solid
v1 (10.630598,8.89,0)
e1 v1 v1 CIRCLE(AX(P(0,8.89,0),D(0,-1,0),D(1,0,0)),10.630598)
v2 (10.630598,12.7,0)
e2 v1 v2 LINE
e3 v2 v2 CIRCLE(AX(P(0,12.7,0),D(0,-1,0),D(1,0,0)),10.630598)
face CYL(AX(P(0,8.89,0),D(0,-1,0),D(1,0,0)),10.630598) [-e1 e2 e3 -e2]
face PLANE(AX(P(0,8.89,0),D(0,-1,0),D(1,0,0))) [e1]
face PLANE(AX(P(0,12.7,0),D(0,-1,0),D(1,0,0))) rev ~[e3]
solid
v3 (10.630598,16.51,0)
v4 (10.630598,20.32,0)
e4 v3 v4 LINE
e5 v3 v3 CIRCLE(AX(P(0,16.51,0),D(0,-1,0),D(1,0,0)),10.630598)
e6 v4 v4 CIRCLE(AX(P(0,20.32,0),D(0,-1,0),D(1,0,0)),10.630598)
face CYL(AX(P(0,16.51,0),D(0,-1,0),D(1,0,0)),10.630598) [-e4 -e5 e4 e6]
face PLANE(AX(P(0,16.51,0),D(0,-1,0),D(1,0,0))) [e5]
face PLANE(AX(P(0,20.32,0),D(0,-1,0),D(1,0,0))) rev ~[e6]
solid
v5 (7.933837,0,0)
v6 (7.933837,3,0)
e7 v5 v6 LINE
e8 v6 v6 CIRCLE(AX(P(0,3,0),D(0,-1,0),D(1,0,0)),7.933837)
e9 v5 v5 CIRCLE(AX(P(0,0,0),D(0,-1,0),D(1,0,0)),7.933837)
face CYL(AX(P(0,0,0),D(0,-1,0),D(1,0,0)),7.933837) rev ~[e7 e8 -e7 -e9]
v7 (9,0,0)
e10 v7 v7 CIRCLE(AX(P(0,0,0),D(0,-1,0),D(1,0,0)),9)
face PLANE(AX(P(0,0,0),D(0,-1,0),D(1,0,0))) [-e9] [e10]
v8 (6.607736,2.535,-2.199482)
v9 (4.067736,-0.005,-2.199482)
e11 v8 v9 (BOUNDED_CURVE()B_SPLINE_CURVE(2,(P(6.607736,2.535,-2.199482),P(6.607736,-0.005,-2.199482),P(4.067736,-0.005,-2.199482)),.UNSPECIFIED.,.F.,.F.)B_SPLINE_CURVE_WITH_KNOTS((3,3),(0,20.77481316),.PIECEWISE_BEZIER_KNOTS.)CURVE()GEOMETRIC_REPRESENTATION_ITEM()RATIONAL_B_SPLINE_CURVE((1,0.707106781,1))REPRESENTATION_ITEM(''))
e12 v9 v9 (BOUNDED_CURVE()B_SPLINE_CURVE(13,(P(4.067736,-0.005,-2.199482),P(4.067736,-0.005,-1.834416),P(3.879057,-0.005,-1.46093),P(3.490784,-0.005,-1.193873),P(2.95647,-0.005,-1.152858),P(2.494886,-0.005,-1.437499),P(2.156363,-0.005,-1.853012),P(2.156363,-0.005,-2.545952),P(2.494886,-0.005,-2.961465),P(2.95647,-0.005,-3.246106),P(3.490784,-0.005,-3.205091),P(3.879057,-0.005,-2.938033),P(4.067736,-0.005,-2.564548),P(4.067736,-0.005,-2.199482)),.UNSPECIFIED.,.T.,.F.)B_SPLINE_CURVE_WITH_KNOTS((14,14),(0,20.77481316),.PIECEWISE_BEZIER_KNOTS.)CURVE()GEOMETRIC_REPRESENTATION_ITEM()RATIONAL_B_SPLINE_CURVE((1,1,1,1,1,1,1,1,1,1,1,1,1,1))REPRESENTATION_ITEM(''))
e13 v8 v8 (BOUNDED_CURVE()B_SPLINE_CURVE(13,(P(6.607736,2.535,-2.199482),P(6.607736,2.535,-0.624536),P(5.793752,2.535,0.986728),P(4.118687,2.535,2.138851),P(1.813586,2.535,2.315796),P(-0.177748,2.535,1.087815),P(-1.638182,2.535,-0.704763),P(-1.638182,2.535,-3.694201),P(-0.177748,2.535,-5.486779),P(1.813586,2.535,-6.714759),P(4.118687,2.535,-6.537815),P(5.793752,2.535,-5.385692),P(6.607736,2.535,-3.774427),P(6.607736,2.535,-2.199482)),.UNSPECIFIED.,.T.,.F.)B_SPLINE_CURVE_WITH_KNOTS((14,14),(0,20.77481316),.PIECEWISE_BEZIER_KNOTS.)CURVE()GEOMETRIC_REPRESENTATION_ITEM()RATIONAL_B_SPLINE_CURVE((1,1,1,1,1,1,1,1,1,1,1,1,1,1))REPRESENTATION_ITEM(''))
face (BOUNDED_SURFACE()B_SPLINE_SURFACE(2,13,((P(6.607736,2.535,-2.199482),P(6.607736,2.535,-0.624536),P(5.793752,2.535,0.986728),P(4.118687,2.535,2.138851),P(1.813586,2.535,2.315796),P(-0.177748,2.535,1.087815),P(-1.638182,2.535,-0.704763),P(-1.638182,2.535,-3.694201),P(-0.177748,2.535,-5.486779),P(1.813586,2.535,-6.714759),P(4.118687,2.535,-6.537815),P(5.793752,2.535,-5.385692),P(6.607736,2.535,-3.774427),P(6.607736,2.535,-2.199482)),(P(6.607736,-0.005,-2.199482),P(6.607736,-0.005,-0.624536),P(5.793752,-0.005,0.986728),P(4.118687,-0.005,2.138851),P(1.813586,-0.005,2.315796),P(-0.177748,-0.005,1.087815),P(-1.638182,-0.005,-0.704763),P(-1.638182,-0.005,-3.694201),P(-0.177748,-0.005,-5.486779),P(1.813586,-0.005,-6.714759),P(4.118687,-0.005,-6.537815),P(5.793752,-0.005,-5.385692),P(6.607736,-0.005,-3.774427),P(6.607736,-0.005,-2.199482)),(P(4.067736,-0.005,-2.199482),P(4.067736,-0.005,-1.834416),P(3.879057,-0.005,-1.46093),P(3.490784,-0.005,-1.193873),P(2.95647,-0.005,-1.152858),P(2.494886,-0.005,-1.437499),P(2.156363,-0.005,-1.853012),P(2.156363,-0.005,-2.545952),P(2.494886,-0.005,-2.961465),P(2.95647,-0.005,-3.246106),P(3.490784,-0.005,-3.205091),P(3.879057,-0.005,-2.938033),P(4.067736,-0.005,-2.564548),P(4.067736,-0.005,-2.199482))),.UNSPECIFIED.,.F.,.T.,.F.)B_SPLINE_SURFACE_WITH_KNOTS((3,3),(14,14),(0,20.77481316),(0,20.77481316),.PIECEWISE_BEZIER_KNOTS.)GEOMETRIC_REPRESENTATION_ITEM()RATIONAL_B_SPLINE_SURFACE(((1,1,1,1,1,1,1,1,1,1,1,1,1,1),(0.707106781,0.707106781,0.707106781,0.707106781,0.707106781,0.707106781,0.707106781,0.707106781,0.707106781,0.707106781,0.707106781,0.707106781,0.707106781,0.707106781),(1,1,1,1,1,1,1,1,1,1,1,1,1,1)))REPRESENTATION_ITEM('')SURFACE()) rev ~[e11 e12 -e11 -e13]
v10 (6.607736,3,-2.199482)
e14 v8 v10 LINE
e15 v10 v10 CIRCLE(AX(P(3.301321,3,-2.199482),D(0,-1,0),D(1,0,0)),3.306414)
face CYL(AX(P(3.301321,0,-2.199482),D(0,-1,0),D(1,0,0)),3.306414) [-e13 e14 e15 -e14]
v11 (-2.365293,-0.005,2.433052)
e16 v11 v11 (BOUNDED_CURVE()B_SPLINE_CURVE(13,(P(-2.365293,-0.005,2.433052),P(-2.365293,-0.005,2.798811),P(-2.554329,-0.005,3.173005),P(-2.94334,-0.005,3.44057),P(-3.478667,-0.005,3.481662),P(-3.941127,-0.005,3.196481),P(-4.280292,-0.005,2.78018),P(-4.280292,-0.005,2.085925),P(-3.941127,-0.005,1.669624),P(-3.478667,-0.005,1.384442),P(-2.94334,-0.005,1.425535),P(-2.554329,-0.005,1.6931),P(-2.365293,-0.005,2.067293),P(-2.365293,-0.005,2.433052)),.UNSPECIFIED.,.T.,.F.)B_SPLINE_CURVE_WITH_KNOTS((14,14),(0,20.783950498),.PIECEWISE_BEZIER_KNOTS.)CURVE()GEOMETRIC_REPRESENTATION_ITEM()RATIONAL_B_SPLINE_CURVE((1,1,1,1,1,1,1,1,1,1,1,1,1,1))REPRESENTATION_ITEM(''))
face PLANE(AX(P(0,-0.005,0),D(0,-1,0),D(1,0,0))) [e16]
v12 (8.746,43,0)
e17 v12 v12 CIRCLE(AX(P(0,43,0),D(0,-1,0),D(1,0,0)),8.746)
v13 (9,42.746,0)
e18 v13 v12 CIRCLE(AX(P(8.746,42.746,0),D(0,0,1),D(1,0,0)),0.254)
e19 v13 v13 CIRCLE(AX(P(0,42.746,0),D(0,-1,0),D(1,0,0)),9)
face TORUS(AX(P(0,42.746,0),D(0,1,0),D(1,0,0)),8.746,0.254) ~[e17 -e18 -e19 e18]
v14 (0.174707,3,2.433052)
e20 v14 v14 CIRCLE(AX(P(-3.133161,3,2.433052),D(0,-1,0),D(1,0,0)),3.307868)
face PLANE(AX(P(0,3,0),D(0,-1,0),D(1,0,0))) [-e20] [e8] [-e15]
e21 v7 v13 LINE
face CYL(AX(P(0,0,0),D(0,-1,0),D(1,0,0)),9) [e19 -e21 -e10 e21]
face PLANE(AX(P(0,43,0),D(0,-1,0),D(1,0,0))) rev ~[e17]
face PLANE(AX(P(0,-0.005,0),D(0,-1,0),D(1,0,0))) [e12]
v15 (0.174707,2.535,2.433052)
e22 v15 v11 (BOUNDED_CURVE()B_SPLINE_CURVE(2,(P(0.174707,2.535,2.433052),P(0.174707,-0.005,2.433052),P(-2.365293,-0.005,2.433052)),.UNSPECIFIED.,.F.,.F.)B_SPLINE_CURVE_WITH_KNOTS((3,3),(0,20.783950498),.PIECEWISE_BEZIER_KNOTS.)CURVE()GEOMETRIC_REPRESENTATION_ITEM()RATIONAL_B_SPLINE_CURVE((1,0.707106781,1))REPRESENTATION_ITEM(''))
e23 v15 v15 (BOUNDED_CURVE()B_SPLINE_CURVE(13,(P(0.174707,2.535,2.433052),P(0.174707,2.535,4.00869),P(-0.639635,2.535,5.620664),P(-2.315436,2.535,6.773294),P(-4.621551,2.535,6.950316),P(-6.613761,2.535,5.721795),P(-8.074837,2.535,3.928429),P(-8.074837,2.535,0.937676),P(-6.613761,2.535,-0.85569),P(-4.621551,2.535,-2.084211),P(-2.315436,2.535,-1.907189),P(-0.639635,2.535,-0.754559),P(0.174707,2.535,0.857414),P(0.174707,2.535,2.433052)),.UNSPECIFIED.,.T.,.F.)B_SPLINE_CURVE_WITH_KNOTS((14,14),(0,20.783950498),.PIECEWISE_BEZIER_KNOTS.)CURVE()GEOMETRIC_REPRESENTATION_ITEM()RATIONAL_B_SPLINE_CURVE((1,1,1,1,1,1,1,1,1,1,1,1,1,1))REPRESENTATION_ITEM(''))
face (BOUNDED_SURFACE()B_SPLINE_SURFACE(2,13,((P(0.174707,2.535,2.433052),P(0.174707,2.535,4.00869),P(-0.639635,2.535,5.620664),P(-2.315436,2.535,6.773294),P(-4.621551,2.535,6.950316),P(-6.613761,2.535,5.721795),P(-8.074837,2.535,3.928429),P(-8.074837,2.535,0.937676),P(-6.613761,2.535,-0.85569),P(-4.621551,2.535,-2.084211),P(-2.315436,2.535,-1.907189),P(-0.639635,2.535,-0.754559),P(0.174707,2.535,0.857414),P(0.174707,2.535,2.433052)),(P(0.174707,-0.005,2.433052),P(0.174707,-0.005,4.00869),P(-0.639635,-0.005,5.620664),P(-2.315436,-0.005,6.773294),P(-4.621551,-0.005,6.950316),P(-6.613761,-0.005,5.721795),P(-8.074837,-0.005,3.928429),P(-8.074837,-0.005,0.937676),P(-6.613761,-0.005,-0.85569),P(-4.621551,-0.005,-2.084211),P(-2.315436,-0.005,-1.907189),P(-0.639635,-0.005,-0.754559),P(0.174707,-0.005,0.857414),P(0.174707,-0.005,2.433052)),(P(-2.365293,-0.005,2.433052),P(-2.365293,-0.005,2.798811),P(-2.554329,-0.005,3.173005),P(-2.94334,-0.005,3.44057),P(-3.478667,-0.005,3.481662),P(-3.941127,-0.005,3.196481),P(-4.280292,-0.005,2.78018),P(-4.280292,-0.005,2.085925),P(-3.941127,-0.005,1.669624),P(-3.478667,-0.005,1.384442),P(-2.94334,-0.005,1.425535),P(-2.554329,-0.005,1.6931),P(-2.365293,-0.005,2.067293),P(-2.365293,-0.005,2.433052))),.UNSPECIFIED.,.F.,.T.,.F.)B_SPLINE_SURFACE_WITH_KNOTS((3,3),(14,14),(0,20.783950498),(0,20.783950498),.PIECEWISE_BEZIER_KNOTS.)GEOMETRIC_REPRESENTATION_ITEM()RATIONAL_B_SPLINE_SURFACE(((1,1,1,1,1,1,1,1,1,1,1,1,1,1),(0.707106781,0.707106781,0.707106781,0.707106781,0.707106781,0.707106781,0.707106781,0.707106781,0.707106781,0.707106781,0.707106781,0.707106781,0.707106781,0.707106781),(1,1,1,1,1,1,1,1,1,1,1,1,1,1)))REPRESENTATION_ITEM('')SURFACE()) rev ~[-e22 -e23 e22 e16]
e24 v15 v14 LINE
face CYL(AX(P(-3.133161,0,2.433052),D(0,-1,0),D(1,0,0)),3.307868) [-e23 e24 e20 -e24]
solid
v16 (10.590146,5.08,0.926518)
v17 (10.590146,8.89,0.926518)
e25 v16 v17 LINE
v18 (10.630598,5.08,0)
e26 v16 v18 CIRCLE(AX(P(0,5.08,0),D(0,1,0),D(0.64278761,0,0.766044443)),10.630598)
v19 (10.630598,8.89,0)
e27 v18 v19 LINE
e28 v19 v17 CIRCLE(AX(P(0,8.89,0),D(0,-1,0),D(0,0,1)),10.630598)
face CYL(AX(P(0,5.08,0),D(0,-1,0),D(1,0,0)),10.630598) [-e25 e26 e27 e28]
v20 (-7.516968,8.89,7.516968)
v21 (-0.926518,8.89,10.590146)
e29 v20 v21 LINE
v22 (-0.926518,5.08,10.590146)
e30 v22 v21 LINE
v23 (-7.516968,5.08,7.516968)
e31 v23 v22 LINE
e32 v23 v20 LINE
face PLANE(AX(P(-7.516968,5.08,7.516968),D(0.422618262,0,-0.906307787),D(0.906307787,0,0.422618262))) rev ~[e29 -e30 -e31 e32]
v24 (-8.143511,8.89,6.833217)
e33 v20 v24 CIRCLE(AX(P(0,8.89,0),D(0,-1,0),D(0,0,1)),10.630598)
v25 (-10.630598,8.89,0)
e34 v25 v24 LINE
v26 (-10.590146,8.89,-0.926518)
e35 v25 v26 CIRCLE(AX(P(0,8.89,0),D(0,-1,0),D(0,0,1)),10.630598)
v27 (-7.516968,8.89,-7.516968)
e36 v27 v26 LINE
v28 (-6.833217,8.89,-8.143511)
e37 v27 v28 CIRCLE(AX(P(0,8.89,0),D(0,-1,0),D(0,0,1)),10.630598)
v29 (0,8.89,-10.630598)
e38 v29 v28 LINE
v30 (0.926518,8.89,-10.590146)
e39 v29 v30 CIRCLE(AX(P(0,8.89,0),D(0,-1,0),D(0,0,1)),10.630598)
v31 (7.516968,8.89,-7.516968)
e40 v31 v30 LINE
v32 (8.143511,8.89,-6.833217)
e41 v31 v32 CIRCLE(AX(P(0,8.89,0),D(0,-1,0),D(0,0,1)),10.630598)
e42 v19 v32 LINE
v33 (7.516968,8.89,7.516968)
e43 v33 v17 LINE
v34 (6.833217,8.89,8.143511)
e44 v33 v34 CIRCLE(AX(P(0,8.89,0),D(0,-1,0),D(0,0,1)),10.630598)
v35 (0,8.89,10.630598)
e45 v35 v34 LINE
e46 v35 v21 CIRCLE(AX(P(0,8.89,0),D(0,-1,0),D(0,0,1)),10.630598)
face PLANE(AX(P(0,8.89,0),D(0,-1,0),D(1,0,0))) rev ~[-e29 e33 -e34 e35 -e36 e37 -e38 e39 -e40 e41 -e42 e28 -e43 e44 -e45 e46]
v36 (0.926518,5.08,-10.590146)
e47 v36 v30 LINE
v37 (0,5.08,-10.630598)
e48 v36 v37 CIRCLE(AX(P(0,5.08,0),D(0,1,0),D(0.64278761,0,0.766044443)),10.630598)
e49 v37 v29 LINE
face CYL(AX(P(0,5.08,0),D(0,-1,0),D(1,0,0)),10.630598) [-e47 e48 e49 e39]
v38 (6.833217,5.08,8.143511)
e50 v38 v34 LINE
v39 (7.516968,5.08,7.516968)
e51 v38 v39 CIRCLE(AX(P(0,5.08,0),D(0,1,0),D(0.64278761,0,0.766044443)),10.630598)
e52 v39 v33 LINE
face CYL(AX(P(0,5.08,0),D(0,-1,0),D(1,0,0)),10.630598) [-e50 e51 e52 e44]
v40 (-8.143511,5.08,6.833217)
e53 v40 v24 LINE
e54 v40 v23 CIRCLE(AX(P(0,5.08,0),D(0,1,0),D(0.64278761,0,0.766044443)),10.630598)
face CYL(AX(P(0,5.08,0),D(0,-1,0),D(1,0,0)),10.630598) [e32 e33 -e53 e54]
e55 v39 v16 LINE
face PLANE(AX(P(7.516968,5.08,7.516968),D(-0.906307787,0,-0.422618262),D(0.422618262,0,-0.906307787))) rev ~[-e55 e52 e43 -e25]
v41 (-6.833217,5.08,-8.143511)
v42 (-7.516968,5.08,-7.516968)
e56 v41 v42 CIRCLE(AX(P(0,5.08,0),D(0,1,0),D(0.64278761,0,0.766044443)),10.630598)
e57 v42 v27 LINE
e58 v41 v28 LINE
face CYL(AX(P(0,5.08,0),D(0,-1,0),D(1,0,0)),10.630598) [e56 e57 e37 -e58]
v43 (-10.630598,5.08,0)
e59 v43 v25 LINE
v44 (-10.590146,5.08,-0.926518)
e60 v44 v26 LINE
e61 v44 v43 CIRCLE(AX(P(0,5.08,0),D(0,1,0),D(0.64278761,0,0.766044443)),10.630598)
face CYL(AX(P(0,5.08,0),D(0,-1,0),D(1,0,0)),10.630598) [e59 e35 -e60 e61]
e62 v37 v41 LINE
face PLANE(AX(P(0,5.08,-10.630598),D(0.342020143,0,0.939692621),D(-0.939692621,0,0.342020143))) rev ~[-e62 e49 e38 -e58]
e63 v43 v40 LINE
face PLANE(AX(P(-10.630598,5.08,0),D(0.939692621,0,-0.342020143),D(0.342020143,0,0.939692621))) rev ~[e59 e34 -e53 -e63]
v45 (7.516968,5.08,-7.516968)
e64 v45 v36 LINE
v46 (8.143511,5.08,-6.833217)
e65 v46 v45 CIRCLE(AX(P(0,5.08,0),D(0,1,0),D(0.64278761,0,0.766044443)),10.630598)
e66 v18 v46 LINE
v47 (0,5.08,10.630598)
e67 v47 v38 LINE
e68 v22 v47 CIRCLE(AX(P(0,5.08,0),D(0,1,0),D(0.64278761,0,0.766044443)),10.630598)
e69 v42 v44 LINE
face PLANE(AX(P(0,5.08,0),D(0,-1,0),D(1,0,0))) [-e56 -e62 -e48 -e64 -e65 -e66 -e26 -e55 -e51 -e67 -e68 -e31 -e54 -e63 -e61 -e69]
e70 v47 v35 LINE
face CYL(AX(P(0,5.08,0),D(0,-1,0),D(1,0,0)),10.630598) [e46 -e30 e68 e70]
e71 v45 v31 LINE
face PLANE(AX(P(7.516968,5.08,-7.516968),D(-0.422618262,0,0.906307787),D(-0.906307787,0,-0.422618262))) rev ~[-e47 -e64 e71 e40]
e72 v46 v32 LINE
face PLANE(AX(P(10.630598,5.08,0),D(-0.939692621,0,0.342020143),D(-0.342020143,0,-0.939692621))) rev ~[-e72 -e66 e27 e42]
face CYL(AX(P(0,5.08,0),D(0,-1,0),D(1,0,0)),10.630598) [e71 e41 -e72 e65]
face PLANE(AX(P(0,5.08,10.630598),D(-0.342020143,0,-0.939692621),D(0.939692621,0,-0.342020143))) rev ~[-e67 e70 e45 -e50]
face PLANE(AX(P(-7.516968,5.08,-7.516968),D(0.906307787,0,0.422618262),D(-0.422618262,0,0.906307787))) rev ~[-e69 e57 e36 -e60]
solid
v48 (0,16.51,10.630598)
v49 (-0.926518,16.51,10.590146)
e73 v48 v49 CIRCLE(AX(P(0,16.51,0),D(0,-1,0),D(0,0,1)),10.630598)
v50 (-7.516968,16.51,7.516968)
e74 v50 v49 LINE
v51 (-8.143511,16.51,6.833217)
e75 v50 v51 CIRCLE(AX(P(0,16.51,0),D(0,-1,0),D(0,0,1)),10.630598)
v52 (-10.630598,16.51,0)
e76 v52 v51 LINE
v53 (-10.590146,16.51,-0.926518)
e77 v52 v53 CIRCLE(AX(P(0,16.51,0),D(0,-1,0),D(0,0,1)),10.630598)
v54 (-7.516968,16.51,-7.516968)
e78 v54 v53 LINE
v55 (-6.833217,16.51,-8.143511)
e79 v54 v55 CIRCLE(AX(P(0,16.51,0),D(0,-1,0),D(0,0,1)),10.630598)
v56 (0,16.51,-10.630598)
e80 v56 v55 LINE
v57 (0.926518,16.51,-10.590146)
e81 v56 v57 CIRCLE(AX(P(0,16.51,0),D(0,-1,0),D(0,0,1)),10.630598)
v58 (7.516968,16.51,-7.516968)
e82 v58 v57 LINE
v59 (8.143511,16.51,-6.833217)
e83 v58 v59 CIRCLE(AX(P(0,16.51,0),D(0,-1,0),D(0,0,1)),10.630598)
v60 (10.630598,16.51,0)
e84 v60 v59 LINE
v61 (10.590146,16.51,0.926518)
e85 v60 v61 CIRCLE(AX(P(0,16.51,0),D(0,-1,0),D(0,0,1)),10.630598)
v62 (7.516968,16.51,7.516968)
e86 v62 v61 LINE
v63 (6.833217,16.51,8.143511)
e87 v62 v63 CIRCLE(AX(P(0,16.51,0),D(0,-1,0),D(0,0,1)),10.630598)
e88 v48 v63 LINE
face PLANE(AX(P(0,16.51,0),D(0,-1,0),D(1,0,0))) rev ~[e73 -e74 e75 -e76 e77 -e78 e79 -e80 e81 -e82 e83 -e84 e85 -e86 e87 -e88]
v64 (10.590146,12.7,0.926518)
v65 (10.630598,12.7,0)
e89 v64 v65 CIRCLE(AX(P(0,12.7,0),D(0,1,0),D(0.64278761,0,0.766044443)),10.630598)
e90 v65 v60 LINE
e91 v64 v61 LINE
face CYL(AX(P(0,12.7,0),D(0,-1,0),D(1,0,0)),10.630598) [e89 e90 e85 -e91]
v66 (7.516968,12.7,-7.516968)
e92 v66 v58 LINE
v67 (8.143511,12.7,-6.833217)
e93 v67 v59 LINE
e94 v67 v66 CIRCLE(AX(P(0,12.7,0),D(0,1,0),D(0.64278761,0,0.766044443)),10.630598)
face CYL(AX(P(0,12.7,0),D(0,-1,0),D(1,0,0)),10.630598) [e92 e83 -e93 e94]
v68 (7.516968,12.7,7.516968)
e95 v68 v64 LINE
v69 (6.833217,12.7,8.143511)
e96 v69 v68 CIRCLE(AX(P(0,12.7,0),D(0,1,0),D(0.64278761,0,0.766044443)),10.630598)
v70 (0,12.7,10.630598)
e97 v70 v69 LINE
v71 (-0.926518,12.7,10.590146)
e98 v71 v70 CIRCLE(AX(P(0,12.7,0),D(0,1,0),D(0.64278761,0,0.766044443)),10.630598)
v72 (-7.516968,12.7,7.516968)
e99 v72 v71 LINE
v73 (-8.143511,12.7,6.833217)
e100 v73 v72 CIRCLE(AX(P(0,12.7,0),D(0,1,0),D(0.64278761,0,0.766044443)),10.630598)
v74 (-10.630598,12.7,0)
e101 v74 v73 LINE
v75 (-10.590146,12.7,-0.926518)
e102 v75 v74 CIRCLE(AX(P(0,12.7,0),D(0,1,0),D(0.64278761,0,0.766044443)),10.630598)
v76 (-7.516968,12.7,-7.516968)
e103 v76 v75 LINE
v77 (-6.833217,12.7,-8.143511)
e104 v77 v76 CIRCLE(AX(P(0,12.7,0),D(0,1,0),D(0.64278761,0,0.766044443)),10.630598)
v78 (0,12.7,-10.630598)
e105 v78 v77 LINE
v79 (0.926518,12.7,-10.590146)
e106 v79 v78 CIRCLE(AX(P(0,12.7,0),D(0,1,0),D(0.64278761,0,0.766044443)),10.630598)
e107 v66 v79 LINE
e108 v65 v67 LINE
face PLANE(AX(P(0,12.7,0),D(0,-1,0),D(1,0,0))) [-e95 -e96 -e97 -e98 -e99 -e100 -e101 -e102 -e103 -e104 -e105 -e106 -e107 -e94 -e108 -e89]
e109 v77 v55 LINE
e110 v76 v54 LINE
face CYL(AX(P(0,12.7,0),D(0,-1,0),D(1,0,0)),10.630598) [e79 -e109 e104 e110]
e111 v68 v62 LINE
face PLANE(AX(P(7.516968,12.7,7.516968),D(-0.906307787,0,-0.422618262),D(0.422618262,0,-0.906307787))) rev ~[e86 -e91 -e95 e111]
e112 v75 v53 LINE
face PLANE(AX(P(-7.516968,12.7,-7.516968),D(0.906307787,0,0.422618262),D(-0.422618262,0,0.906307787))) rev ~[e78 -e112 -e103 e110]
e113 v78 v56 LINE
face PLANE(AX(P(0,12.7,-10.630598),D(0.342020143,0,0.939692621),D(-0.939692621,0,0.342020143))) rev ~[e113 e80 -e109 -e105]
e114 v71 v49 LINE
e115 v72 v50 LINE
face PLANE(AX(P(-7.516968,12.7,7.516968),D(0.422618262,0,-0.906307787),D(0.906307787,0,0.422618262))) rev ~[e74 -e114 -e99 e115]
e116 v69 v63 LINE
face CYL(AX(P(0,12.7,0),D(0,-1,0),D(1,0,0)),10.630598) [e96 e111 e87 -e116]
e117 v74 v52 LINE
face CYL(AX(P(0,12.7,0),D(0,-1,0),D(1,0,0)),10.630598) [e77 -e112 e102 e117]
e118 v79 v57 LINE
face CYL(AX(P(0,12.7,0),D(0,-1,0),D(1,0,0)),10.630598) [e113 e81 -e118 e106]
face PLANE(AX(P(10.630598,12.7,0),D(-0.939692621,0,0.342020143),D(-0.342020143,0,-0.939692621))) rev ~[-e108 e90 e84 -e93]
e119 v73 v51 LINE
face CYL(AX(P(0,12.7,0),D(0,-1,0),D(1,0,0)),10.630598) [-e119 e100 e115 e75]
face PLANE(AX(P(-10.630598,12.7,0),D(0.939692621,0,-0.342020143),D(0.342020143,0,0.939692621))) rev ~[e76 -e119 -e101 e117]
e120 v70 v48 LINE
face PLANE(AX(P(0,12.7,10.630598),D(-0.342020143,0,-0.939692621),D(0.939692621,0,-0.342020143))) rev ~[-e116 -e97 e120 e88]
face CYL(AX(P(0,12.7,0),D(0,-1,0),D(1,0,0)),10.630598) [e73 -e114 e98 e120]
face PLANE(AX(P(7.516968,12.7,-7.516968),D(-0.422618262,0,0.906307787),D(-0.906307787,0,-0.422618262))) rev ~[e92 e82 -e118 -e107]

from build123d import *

# Parameters (mm, degrees)
F0_R             = 9
F1_DEPTH         = 43
F2_R             = 7.9338373334
F2_R_2           = 3.3064142063
F2_R_3           = 3.3078684587
F3_DEPTH         = 3
F4_DEPTH         = 0.005
F5_R             = 2.54
F6_R             = 0.254
F8_R             = 10.630598255
F9_DEPTH         = 3.81
F10_DEPTH        = 3.81
F11_DEPTH        = 3.81
F12_DEPTH        = 3.81
F14_DEPTH        = 3.81
F14_COPIES_COUNT = 8
F16_DEPTH        = 3.81
F16_COPIES_COUNT = 8


# Not quite as in the source:
# - a pattern or mirror of a feature is missing from the dataset's text; its kind, count and spacing are read off the source's solid


with BuildPart() as f1:
    # F0 (on Front) → F1 (new body)
    with BuildSketch(Plane.XZ):
        Circle(F0_R)
    extrude(amount=-F1_DEPTH)

    # F2 (on face) → F3 (cut)
    with BuildSketch(Plane.XZ):
        Circle(F2_R)
        with Locations((3.3013214234, -2.1994818862)):
            Circle(F2_R_2, mode=Mode.SUBTRACT)
        with Locations((-3.133161364, 2.4330523165)):
            Circle(F2_R_3, mode=Mode.SUBTRACT)
    extrude(amount=-F3_DEPTH, mode=Mode.SUBTRACT)

    # F4 (add): faces of the model
    f4_faces = [f1.faces().sort_by_distance(p)[0] for p in [
        (-3.133161364, 0, 2.4330523165),
        (3.3013214234, 0, -2.1994818862),
    ]]
    extrude(f4_faces, amount=F4_DEPTH)

    # F5
    f5_edges = [f1.edges().sort_by_distance(p)[0] for p in [
        (-6.44103, -0.005, 2.433052),
        (-0.005093, -0.005, -2.199482),
    ]]
    fillet(f5_edges, radius=F5_R)

    # F6
    f6_edges = [f1.edges().sort_by_distance(p)[0] for p in [
        (-9, 43, 0),
    ]]
    fillet(f6_edges, radius=F6_R)


with BuildPart() as f9:
    # F8 (on offset) → F9 (new body)
    with BuildSketch(Plane.XZ.offset(-5.08)):
        Circle(F8_R)
    extrude(amount=-F9_DEPTH)


with BuildPart() as f10:
    # F10 (new): a face of the model
    f10_faces = [f9.part.faces().sort_by_distance(p)[0] for p in [
        (0, 8.89, 0),
    ]]
    extrude(f10_faces, amount=F10_DEPTH)


with BuildPart() as f11:
    # F11 (new): a face of the model
    f11_faces = [f10.part.faces().sort_by_distance(p)[0] for p in [
        (0, 12.7, 0),
    ]]
    extrude(f11_faces, amount=F11_DEPTH)


with BuildPart() as f12:
    # F12 (new): a face of the model
    f12_faces = [f11.part.faces().sort_by_distance(p)[0] for p in [
        (0, 16.51, 0),
    ]]
    extrude(f12_faces, amount=F12_DEPTH)


with BuildPart() as f9_1:
    add(f9.part)

    # F13 (on face) → F14 (cut)
    with BuildSketch(Plane.XZ.offset(-5.08)):
        with BuildLine():
            ThreePointArc((6.8332168419, 8.1435107203), (3.6358787388, 9.9894947348), (0, 10.630598255))
            Line((0, 10.630598255), (6.8332168419, 8.1435107203))
        make_face()
    f14 = extrude(amount=-F14_DEPTH, mode=Mode.SUBTRACT)

    # F14_copies: F14 ×8 about axis
    f14_copies_axis = Axis((0, 0, 0), (0, 1, 0))
    for i in range(1, F14_COPIES_COUNT):
        add(f14.rotate(f14_copies_axis, i * 360 / F14_COPIES_COUNT), mode=Mode.SUBTRACT)


with BuildPart() as f11_1:
    add(f11.part)

    # F15 (on face) → F16 (cut)
    with BuildSketch(Plane.XZ.offset(-12.7)):
        with BuildLine():
            Line((0, 10.630598255), (6.8332168419, 8.1435107203))
            ThreePointArc((6.8332168419, 8.1435107203), (3.6358787388, 9.9894947348), (0, 10.630598255))
        make_face()
    f16 = extrude(amount=-F16_DEPTH, mode=Mode.SUBTRACT)

    # F16_copies: F16 ×8 about axis
    f16_copies_axis = Axis((0, 0, 0), (0, 1, 0))
    for i in range(1, F16_COPIES_COUNT):
        add(f16.rotate(f16_copies_axis, i * 360 / F16_COPIES_COUNT), mode=Mode.SUBTRACT)


solid = Compound([f1.part, f10.part, f12.part, f9_1.part, f11_1.part])
